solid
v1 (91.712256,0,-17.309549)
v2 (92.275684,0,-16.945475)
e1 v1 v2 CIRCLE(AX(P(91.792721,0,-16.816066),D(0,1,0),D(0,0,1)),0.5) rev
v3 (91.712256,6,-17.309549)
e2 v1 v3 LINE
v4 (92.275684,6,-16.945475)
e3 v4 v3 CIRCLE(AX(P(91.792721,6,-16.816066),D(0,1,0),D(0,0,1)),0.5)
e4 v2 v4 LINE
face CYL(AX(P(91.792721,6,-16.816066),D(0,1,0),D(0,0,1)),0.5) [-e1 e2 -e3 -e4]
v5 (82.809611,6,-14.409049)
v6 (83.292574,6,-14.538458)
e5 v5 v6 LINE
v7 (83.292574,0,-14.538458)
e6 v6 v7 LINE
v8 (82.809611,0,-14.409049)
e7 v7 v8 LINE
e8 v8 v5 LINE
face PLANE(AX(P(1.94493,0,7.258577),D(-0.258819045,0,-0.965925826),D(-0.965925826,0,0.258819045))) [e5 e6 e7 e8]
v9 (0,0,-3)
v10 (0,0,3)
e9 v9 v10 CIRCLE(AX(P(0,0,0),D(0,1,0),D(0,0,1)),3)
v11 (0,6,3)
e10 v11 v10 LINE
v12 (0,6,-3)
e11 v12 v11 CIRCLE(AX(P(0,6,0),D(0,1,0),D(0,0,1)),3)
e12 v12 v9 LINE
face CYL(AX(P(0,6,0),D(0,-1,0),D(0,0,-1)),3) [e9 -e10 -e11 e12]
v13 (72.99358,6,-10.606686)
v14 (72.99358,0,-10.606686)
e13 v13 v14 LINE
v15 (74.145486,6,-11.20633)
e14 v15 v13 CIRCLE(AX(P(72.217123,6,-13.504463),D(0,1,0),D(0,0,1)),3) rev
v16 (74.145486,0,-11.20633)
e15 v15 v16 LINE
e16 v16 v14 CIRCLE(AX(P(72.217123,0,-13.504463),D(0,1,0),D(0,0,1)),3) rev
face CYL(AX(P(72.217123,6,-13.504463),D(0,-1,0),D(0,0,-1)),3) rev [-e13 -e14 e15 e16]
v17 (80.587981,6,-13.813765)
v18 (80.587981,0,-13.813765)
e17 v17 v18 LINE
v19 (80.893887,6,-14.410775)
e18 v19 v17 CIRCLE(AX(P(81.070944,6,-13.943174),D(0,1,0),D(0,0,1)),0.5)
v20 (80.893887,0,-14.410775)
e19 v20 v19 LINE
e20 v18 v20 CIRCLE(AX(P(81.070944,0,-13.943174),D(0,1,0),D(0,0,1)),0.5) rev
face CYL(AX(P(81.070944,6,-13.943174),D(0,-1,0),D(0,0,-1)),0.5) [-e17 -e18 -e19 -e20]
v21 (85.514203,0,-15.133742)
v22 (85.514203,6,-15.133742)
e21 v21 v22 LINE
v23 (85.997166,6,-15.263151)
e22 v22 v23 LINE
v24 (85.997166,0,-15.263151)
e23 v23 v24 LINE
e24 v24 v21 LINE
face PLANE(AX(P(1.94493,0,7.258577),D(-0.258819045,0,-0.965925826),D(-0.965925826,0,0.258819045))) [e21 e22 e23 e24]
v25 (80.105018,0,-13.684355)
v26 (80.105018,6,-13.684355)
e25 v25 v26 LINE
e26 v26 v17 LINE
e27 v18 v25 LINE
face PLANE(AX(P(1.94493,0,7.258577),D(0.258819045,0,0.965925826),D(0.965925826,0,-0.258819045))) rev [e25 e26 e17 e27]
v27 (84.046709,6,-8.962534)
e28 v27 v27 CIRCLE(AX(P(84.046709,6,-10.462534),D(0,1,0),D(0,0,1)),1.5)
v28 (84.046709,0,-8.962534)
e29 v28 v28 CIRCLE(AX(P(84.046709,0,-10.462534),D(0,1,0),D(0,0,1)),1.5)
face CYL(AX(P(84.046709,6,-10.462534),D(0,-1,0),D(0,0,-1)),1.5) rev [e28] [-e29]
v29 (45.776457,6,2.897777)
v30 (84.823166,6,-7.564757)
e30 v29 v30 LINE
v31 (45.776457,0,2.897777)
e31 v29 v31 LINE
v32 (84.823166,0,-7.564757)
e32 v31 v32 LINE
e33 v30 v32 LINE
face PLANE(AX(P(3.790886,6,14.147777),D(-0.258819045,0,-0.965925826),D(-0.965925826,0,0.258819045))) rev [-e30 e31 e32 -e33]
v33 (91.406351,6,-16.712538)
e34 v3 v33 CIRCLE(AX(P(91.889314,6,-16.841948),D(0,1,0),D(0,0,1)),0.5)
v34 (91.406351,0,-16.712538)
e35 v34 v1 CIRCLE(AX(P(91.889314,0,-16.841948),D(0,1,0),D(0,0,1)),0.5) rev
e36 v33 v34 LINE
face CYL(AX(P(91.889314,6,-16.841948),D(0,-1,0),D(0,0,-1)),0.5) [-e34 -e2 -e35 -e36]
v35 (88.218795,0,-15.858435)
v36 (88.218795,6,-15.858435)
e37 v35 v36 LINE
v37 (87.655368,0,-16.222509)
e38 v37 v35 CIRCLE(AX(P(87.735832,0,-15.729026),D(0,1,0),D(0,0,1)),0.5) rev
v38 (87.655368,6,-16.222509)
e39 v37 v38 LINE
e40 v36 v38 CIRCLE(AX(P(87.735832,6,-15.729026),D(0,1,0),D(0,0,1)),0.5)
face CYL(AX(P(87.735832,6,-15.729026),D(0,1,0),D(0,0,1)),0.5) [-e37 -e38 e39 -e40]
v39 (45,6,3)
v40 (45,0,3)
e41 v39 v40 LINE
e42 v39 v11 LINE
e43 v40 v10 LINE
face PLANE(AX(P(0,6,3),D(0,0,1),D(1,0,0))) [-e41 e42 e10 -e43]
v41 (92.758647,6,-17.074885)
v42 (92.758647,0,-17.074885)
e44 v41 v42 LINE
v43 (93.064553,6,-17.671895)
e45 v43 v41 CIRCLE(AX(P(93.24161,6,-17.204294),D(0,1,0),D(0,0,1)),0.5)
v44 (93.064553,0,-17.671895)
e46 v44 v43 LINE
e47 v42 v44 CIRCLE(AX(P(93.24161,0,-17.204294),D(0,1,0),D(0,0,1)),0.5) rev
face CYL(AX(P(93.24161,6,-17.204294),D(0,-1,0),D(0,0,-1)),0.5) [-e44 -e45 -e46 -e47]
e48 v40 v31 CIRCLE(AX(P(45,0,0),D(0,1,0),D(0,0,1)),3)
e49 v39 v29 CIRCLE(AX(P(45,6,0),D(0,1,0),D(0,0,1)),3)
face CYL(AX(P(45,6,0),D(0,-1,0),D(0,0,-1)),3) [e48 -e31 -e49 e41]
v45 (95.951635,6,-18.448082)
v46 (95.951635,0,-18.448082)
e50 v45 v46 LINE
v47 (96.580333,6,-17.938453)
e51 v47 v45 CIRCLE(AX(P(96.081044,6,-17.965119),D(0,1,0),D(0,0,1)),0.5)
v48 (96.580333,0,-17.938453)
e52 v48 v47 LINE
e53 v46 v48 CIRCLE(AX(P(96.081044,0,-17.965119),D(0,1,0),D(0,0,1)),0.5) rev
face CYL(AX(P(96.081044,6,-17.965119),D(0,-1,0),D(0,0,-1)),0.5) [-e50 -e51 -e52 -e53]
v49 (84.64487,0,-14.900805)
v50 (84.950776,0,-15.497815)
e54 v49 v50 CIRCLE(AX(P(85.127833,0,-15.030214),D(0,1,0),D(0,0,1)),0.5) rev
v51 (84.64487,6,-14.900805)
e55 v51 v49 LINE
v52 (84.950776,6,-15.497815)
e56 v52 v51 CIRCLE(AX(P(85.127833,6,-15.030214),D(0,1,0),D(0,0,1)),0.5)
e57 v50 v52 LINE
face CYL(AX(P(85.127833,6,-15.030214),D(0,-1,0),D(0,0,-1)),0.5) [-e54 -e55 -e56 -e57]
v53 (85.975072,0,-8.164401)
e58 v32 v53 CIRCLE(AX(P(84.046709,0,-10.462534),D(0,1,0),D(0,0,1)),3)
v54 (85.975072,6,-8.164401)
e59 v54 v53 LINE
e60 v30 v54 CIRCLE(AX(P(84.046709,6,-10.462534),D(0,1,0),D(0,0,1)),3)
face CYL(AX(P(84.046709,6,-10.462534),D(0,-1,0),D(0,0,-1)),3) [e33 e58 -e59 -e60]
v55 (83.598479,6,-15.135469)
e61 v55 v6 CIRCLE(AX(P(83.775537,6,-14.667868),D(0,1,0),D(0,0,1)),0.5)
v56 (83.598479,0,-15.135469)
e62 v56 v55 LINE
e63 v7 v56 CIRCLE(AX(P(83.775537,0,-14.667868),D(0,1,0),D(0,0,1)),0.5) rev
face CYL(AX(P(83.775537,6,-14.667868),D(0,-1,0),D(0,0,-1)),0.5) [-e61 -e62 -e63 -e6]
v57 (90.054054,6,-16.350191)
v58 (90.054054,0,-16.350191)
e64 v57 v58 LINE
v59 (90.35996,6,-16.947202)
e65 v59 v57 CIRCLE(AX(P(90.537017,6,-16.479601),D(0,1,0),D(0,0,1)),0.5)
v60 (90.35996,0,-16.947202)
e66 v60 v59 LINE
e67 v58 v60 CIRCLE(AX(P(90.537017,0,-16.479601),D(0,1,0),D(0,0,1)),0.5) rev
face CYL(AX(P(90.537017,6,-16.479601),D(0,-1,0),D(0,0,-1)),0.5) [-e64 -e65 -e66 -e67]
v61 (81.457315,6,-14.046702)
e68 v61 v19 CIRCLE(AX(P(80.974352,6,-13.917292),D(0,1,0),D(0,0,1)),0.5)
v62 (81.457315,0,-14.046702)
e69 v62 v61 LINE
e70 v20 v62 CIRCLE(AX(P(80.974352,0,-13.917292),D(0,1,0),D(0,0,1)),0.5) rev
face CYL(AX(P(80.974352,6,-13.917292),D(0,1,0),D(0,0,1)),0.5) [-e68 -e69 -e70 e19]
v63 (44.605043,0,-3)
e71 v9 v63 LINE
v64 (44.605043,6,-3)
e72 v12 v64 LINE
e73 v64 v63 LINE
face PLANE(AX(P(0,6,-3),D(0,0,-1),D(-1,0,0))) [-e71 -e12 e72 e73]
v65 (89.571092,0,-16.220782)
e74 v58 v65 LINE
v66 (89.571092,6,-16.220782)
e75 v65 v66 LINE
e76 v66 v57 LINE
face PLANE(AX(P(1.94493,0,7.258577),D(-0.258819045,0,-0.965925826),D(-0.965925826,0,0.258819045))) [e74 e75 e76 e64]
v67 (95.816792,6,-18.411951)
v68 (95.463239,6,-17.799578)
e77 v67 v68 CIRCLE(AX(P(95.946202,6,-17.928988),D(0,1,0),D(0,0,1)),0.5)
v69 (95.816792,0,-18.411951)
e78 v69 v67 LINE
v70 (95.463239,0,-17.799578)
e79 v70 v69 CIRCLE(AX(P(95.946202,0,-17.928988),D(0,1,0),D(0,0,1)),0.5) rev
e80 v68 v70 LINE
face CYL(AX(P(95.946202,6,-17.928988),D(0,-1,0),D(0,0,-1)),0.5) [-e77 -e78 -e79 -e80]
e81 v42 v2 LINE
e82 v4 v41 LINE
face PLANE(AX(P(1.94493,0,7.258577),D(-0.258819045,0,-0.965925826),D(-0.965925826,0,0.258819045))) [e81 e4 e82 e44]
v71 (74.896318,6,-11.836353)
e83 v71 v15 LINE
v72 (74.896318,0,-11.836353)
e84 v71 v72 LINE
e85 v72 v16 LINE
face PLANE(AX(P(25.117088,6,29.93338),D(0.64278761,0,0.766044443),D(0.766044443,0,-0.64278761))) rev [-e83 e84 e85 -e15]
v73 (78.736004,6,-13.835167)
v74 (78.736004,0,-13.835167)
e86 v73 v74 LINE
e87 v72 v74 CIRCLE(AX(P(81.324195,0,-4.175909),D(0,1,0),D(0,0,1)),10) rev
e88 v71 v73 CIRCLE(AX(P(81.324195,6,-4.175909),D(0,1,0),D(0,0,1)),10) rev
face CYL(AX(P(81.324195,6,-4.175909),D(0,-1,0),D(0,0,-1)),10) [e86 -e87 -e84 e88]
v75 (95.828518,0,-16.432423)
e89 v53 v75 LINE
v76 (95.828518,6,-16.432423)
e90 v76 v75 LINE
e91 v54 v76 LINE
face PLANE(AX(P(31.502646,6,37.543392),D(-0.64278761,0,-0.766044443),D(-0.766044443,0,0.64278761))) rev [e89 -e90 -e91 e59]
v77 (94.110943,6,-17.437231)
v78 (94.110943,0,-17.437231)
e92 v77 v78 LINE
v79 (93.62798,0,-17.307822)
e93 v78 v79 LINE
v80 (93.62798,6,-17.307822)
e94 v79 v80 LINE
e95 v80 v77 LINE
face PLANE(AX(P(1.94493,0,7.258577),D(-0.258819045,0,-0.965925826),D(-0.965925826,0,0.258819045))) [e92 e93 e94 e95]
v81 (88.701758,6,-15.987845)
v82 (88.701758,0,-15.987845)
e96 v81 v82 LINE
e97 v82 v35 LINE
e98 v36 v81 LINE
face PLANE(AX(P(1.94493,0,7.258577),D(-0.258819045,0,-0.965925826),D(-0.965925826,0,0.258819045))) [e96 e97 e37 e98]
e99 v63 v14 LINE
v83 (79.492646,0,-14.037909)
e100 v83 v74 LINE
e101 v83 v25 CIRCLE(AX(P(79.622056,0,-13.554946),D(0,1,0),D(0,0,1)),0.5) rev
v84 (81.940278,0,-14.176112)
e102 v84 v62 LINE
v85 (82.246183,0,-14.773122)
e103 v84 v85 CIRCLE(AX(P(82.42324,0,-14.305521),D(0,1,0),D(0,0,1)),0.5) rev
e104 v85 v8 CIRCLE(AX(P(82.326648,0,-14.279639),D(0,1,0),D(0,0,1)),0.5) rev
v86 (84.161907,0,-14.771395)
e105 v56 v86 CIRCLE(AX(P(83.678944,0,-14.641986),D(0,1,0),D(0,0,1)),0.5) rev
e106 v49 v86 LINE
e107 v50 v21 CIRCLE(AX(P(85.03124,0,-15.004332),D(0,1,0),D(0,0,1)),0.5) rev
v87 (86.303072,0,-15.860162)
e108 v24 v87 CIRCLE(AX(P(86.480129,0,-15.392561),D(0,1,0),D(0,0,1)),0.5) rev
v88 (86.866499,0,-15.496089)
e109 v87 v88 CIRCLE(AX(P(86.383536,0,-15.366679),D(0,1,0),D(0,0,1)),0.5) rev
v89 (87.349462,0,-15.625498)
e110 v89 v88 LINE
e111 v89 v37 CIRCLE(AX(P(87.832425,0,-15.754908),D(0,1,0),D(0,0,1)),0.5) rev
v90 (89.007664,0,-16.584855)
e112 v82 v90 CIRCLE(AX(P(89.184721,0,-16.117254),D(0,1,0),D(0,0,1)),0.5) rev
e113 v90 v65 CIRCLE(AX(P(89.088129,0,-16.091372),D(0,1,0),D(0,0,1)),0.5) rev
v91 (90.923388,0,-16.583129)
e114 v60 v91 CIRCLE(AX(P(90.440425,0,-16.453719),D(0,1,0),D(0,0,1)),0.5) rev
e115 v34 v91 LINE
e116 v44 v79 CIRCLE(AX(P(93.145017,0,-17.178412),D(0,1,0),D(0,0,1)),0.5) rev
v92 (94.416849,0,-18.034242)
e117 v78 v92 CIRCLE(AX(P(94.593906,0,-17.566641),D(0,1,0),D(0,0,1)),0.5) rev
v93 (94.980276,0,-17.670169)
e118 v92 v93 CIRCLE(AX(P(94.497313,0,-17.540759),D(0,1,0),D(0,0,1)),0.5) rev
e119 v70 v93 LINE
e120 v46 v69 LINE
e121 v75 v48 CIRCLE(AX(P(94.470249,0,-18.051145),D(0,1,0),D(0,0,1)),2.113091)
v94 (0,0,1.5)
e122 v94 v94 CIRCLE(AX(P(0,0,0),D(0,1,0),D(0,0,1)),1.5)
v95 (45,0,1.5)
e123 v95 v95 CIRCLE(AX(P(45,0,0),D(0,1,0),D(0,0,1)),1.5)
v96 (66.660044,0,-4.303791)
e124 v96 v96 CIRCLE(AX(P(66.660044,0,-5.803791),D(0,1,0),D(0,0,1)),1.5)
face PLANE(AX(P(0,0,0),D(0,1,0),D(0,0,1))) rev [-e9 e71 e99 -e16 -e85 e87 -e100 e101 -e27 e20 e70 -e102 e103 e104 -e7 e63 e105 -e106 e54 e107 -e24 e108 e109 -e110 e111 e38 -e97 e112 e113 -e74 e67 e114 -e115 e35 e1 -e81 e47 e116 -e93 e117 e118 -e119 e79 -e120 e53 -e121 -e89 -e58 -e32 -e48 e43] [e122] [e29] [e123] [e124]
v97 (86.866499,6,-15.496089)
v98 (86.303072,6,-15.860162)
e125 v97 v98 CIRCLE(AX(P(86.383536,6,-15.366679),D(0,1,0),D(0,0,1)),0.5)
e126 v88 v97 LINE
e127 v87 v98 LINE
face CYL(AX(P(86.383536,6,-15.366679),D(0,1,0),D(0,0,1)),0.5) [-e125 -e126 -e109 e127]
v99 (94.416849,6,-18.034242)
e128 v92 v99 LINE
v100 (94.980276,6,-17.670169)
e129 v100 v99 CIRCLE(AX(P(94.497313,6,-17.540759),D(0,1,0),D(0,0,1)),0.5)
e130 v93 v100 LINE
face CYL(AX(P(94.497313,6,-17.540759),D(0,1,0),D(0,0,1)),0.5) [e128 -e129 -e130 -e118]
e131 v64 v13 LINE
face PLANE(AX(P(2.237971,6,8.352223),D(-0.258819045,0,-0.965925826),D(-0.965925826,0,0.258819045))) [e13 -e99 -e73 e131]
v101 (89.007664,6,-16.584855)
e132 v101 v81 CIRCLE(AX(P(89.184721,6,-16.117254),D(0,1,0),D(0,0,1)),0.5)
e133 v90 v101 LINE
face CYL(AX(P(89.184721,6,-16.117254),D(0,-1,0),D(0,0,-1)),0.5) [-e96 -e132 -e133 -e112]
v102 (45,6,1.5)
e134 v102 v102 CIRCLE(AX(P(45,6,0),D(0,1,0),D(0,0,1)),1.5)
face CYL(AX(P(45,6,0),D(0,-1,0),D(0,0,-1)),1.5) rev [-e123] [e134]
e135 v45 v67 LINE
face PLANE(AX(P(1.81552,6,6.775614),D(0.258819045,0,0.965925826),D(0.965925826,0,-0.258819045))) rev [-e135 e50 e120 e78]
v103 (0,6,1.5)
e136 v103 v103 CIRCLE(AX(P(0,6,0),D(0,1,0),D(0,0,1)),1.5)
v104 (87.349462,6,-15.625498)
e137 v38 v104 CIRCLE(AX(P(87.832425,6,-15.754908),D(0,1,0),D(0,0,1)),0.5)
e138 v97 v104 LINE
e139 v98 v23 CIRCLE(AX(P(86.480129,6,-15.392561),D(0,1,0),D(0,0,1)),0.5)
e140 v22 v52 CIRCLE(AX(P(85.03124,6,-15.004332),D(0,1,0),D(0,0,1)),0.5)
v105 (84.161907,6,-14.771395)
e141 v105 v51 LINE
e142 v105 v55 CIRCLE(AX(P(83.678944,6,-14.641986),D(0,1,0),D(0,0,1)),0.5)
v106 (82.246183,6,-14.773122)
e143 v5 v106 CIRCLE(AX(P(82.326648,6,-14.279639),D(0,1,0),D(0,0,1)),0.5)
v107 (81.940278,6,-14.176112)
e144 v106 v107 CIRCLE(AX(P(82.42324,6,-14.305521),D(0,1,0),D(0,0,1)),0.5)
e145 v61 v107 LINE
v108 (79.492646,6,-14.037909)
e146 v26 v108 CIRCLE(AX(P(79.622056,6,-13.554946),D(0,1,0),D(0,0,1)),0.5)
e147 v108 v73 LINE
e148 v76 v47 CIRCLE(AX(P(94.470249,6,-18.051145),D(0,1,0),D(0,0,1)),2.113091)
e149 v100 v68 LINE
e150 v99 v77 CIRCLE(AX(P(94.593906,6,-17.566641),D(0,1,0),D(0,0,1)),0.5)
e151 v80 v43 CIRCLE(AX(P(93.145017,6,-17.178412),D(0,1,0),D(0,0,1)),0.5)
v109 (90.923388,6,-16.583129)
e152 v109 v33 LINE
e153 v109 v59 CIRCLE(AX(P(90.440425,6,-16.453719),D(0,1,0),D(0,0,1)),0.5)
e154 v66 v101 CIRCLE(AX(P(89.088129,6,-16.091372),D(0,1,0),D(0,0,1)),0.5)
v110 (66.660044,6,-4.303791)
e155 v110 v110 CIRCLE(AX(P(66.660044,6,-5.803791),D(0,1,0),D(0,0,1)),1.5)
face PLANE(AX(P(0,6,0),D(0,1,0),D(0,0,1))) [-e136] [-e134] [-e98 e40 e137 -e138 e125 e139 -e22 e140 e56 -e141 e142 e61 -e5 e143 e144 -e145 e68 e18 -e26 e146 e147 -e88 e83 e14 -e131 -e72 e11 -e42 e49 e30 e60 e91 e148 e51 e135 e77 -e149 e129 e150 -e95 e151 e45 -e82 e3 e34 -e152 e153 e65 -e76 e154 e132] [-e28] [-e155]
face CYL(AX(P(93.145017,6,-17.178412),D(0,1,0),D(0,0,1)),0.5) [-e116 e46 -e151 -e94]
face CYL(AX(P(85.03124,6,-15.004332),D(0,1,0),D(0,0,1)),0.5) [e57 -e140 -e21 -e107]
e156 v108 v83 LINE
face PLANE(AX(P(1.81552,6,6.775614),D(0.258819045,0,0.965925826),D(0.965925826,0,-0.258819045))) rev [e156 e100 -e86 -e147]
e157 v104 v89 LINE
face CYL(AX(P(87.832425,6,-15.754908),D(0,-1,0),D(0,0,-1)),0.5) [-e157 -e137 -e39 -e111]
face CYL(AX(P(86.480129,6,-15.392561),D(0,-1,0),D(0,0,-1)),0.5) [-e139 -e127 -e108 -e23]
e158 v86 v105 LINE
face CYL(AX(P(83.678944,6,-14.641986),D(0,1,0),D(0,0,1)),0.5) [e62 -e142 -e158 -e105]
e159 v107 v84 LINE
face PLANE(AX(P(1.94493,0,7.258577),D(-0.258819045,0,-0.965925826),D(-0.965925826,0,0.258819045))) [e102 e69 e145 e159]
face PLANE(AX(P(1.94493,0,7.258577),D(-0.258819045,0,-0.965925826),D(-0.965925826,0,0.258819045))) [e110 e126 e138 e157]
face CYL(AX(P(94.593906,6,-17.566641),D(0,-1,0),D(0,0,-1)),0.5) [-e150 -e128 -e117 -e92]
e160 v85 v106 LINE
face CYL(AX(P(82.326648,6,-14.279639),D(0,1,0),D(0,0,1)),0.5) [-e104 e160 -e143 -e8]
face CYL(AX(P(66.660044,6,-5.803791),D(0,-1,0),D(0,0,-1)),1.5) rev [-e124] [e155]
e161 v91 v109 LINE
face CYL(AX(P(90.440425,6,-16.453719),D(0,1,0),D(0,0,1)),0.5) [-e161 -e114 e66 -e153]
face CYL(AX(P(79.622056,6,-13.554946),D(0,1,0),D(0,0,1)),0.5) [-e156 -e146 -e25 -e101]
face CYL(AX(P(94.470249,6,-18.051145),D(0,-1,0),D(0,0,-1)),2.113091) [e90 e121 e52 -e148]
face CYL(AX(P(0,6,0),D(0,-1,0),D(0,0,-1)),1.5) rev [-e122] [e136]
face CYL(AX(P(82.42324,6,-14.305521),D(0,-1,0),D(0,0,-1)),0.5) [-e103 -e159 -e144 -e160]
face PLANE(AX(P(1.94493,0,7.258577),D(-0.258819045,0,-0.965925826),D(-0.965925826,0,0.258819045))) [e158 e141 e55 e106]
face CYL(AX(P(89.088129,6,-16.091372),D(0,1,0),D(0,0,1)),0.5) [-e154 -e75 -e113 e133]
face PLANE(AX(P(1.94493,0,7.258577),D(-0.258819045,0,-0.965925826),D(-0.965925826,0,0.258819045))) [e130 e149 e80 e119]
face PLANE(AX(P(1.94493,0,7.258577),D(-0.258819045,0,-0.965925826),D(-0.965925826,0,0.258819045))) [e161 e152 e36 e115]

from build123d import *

# Parameters (mm, degrees)
SKETCH1_R           = 1.5
BOSS_EXTRUDE1_DEPTH = 6
SKETCH2_W           = 0.5
SKETCH2_H           = 6
CUT_EXTRUDE1_DEPTH  = 0.5
FILLET1_R           = 0.5


with BuildPart() as part:
    # Sketch1 → Boss-Extrude1 (new body)
    with BuildSketch(Plane(origin=(0, 0, 0), x_dir=(1, 0, 0), z_dir=(0, 1, 0))):
        with BuildLine():
            ThreePointArc((95.828517615, 16.432423404), (96.485539703, 17.415726447), (96.511338172, 18.598053533))
            Line((96.511338172, 18.598053533), (78.7360041, 13.835167123))
            ThreePointArc((78.7360041, 13.835167123), (76.706708419, 13.046017192), (74.896318454, 11.836353292))
            Line((74.896318454, 11.836353292), (74.145485774, 11.206329867))
            ThreePointArc((74.145485774, 11.206329867), (73.602368785, 10.843430696), (72.99358008, 10.606685717))
            Line((72.99358008, 10.606685717), (44.605042506, 3))
            Line((44.605042506, 3), (0, 3))
            ThreePointArc((0, 3), (-3, 0), (0, -3))
            Line((0, -3), (44.999999999, -3))
            ThreePointArc((44.999999999, -3), (45.391578576, -2.974334584), (45.776457135, -2.897777479))
            Line((45.776457135, -2.897777479), (84.823166373, 7.564756729))
            ThreePointArc((84.823166373, 7.564756729), (85.431955077, 7.801501708), (85.975072067, 8.164400878))
            Line((85.975072067, 8.164400878), (95.828517615, 16.432423404))
        make_face()
        with Locations(Location((66.660044365, 5.803791396, 0), (0, 0, 270))):
            Circle(SKETCH1_R, mode=Mode.SUBTRACT)
        with Locations(Location((84.046709238, 10.462534208, 0), (0, 0, 270))):
            Circle(SKETCH1_R, mode=Mode.SUBTRACT)
        with Locations(Location((44.999999999, 0, 0), (0, 0, 270))):
            Circle(SKETCH1_R, mode=Mode.SUBTRACT)
        with Locations(Location((0, 0, 0), (0, 0, 270))):
            Circle(SKETCH1_R, mode=Mode.SUBTRACT)
    extrude(amount=BOSS_EXTRUDE1_DEPTH)

    # Sketch2 → Cut-Extrude1 (cut)
    with BuildSketch(Plane(origin=(1.815520398, 0, 6.775614366), x_dir=(-0.965925826289068, 0, 0.25881904510252224), z_dir=(-0.2588190451025222, 0, -0.9659258262890679))):
        with Locations((-81.167277896, 3)):
            Rectangle(SKETCH2_W, SKETCH2_H)
        with Locations((-82.567277896, 3)):
            Rectangle(SKETCH2_W, SKETCH2_H)
        with Locations((-83.967277896, 3)):
            Rectangle(SKETCH2_W, SKETCH2_H)
        with Locations((-85.367277896, 3)):
            Rectangle(SKETCH2_W, SKETCH2_H)
        with Locations((-86.767277896, 3)):
            Rectangle(SKETCH2_W, SKETCH2_H)
        with Locations((-88.167277896, 3)):
            Rectangle(SKETCH2_W, SKETCH2_H)
        with Locations((-89.567277896, 3)):
            Rectangle(SKETCH2_W, SKETCH2_H)
        with Locations((-90.967277896, 3)):
            Rectangle(SKETCH2_W, SKETCH2_H)
        with Locations((-92.367277896, 3)):
            Rectangle(SKETCH2_W, SKETCH2_H)
        with Locations((-93.767277896, 3)):
            Rectangle(SKETCH2_W, SKETCH2_H)
        with Locations((-95.167277896, 3)):
            Rectangle(SKETCH2_W, SKETCH2_H)
        with Locations((-96.567277896, 3)):
            Rectangle(SKETCH2_W, SKETCH2_H)
    extrude(amount=-CUT_EXTRUDE1_DEPTH, mode=Mode.SUBTRACT)

    # Fillet1
    # the kernel refuses this fillet: 0.5 mm, written as the material it takes off along each edge
    with BuildSketch(Plane(origin=(79.97560891, -1.25, -14.167318231), x_dir=(-0.9659258262890682, 0, 0.25881904510252096), z_dir=(0, 1, 0)), Plane(origin=(81.81086798, -1.25, -14.659074417), x_dir=(0.25881904510251386, 0, 0.9659258262890702), z_dir=(0, 1, 0)), Plane(origin=(83.163164137, -1.25, -15.02142108), x_dir=(0.2588190451025112, 0, 0.9659258262890709), z_dir=(0, 1, 0)), Plane(origin=(84.515460294, -1.25, -15.383767743), x_dir=(0.25881904510251386, 0, 0.9659258262890702), z_dir=(0, 1, 0)), Plane(origin=(85.86775645, -1.25, -15.746114406), x_dir=(0.25881904510251386, 0, 0.9659258262890702), z_dir=(0, 1, 0)), Plane(origin=(87.220052607, -1.25, -16.108461069), x_dir=(0.25881904510251214, 0, 0.9659258262890708), z_dir=(0, 1, 0)), Plane(origin=(88.572348764, -1.25, -16.470807733), x_dir=(0.25881904510251386, 0, 0.9659258262890702), z_dir=(0, 1, 0)), Plane(origin=(89.924644921, -1.25, -16.833154396), x_dir=(0.25881904510251386, 0, 0.9659258262890702), z_dir=(0, 1, 0)), Plane(origin=(91.276941078, -1.25, -17.195501059), x_dir=(0.25881904510251386, 0, 0.9659258262890702), z_dir=(0, 1, 0)), Plane(origin=(92.629237234, -1.25, -17.557847722), x_dir=(0.25881904510251563, 0, 0.9659258262890698), z_dir=(0, 1, 0)), Plane(origin=(93.981533391, -1.25, -17.920194385), x_dir=(0.25881904510251563, 0, 0.9659258262890698), z_dir=(0, 1, 0))) as fillet1_piece_1:
        with BuildLine():
            CenterArc((FILLET1_R, FILLET1_R), FILLET1_R, 180, 90)
            Line((0, FILLET1_R), (0, 0))
            Line((0, 0), (FILLET1_R, 0))
        make_face()
    extrude(amount=8.5, mode=Mode.SUBTRACT)
    with BuildSketch(Plane(origin=(95.333829548, -1.25, -18.282541048), x_dir=(0.9659258262890649, 0, -0.2588190451025338), z_dir=(0, 1, 0)), Plane(origin=(80.458571823, 7.25, -14.296727754), x_dir=(0.25881904510251386, 0, 0.9659258262890702), z_dir=(0, -1, 0)), Plane(origin=(81.327905067, 7.25, -14.529664894), x_dir=(-0.9659258262890683, 0, 0.25881904510252046), z_dir=(0, -1, 0)), Plane(origin=(82.680201224, 7.25, -14.892011557), x_dir=(-0.9659258262890675, 0, 0.2588190451025238), z_dir=(0, -1, 0)), Plane(origin=(84.03249738, 7.25, -15.254358221), x_dir=(-0.9659258262890682, 0, 0.25881904510252096), z_dir=(0, -1, 0)), Plane(origin=(85.384793537, 7.25, -15.616704884), x_dir=(-0.9659258262890675, 0, 0.2588190451025238), z_dir=(0, -1, 0)), Plane(origin=(86.737089694, 7.25, -15.979051547), x_dir=(-0.9659258262890683, 0, 0.25881904510252046), z_dir=(0, -1, 0)), Plane(origin=(88.089385851, 7.25, -16.34139821), x_dir=(-0.9659258262890683, 0, 0.25881904510252046), z_dir=(0, -1, 0)), Plane(origin=(89.441682008, 7.25, -16.703744873), x_dir=(-0.9659258262890704, 0, 0.2588190451025134), z_dir=(0, -1, 0)), Plane(origin=(90.793978164, 7.25, -17.066091536), x_dir=(-0.9659258262890683, 0, 0.25881904510252046), z_dir=(0, -1, 0)), Plane(origin=(92.146274321, 7.25, -17.428438199), x_dir=(-0.9659258262890701, 0, 0.25881904510251436), z_dir=(0, -1, 0)), Plane(origin=(93.498570478, 7.25, -17.790784863), x_dir=(-0.9659258262890682, 0, 0.25881904510252096), z_dir=(0, -1, 0)), Plane(origin=(94.850866635, 7.25, -18.153131526), x_dir=(-0.9659258262890702, 0, 0.25881904510251386), z_dir=(0, -1, 0))) as fillet1_piece_2:
        with BuildLine():
            CenterArc((FILLET1_R, -FILLET1_R), FILLET1_R, 90, 90)
            Line((0, -FILLET1_R), (0, 0))
            Line((0, 0), (FILLET1_R, 0))
        make_face()
    extrude(amount=8.5, mode=Mode.SUBTRACT)
    with BuildSketch(Plane(origin=(96.511338172, -1.657996846, -18.598053533), x_dir=(0.10403330319637054, 0, 0.9945738141666772), z_dir=(0, 1, 0))) as fillet1_piece_3:
        with BuildLine():
            CenterArc((0.584735643, -0.493805167), FILLET1_R, 80.97147389, 108.05705222)
            Line((0.090930477, -0.572268262), (0, 0))
            ThreePointArc((0, 0), (0.331599369, 0.026180497), (0.663198739, 0))
        make_face()
    extrude(amount=9.315993693, mode=Mode.SUBTRACT)


solid = part.part
